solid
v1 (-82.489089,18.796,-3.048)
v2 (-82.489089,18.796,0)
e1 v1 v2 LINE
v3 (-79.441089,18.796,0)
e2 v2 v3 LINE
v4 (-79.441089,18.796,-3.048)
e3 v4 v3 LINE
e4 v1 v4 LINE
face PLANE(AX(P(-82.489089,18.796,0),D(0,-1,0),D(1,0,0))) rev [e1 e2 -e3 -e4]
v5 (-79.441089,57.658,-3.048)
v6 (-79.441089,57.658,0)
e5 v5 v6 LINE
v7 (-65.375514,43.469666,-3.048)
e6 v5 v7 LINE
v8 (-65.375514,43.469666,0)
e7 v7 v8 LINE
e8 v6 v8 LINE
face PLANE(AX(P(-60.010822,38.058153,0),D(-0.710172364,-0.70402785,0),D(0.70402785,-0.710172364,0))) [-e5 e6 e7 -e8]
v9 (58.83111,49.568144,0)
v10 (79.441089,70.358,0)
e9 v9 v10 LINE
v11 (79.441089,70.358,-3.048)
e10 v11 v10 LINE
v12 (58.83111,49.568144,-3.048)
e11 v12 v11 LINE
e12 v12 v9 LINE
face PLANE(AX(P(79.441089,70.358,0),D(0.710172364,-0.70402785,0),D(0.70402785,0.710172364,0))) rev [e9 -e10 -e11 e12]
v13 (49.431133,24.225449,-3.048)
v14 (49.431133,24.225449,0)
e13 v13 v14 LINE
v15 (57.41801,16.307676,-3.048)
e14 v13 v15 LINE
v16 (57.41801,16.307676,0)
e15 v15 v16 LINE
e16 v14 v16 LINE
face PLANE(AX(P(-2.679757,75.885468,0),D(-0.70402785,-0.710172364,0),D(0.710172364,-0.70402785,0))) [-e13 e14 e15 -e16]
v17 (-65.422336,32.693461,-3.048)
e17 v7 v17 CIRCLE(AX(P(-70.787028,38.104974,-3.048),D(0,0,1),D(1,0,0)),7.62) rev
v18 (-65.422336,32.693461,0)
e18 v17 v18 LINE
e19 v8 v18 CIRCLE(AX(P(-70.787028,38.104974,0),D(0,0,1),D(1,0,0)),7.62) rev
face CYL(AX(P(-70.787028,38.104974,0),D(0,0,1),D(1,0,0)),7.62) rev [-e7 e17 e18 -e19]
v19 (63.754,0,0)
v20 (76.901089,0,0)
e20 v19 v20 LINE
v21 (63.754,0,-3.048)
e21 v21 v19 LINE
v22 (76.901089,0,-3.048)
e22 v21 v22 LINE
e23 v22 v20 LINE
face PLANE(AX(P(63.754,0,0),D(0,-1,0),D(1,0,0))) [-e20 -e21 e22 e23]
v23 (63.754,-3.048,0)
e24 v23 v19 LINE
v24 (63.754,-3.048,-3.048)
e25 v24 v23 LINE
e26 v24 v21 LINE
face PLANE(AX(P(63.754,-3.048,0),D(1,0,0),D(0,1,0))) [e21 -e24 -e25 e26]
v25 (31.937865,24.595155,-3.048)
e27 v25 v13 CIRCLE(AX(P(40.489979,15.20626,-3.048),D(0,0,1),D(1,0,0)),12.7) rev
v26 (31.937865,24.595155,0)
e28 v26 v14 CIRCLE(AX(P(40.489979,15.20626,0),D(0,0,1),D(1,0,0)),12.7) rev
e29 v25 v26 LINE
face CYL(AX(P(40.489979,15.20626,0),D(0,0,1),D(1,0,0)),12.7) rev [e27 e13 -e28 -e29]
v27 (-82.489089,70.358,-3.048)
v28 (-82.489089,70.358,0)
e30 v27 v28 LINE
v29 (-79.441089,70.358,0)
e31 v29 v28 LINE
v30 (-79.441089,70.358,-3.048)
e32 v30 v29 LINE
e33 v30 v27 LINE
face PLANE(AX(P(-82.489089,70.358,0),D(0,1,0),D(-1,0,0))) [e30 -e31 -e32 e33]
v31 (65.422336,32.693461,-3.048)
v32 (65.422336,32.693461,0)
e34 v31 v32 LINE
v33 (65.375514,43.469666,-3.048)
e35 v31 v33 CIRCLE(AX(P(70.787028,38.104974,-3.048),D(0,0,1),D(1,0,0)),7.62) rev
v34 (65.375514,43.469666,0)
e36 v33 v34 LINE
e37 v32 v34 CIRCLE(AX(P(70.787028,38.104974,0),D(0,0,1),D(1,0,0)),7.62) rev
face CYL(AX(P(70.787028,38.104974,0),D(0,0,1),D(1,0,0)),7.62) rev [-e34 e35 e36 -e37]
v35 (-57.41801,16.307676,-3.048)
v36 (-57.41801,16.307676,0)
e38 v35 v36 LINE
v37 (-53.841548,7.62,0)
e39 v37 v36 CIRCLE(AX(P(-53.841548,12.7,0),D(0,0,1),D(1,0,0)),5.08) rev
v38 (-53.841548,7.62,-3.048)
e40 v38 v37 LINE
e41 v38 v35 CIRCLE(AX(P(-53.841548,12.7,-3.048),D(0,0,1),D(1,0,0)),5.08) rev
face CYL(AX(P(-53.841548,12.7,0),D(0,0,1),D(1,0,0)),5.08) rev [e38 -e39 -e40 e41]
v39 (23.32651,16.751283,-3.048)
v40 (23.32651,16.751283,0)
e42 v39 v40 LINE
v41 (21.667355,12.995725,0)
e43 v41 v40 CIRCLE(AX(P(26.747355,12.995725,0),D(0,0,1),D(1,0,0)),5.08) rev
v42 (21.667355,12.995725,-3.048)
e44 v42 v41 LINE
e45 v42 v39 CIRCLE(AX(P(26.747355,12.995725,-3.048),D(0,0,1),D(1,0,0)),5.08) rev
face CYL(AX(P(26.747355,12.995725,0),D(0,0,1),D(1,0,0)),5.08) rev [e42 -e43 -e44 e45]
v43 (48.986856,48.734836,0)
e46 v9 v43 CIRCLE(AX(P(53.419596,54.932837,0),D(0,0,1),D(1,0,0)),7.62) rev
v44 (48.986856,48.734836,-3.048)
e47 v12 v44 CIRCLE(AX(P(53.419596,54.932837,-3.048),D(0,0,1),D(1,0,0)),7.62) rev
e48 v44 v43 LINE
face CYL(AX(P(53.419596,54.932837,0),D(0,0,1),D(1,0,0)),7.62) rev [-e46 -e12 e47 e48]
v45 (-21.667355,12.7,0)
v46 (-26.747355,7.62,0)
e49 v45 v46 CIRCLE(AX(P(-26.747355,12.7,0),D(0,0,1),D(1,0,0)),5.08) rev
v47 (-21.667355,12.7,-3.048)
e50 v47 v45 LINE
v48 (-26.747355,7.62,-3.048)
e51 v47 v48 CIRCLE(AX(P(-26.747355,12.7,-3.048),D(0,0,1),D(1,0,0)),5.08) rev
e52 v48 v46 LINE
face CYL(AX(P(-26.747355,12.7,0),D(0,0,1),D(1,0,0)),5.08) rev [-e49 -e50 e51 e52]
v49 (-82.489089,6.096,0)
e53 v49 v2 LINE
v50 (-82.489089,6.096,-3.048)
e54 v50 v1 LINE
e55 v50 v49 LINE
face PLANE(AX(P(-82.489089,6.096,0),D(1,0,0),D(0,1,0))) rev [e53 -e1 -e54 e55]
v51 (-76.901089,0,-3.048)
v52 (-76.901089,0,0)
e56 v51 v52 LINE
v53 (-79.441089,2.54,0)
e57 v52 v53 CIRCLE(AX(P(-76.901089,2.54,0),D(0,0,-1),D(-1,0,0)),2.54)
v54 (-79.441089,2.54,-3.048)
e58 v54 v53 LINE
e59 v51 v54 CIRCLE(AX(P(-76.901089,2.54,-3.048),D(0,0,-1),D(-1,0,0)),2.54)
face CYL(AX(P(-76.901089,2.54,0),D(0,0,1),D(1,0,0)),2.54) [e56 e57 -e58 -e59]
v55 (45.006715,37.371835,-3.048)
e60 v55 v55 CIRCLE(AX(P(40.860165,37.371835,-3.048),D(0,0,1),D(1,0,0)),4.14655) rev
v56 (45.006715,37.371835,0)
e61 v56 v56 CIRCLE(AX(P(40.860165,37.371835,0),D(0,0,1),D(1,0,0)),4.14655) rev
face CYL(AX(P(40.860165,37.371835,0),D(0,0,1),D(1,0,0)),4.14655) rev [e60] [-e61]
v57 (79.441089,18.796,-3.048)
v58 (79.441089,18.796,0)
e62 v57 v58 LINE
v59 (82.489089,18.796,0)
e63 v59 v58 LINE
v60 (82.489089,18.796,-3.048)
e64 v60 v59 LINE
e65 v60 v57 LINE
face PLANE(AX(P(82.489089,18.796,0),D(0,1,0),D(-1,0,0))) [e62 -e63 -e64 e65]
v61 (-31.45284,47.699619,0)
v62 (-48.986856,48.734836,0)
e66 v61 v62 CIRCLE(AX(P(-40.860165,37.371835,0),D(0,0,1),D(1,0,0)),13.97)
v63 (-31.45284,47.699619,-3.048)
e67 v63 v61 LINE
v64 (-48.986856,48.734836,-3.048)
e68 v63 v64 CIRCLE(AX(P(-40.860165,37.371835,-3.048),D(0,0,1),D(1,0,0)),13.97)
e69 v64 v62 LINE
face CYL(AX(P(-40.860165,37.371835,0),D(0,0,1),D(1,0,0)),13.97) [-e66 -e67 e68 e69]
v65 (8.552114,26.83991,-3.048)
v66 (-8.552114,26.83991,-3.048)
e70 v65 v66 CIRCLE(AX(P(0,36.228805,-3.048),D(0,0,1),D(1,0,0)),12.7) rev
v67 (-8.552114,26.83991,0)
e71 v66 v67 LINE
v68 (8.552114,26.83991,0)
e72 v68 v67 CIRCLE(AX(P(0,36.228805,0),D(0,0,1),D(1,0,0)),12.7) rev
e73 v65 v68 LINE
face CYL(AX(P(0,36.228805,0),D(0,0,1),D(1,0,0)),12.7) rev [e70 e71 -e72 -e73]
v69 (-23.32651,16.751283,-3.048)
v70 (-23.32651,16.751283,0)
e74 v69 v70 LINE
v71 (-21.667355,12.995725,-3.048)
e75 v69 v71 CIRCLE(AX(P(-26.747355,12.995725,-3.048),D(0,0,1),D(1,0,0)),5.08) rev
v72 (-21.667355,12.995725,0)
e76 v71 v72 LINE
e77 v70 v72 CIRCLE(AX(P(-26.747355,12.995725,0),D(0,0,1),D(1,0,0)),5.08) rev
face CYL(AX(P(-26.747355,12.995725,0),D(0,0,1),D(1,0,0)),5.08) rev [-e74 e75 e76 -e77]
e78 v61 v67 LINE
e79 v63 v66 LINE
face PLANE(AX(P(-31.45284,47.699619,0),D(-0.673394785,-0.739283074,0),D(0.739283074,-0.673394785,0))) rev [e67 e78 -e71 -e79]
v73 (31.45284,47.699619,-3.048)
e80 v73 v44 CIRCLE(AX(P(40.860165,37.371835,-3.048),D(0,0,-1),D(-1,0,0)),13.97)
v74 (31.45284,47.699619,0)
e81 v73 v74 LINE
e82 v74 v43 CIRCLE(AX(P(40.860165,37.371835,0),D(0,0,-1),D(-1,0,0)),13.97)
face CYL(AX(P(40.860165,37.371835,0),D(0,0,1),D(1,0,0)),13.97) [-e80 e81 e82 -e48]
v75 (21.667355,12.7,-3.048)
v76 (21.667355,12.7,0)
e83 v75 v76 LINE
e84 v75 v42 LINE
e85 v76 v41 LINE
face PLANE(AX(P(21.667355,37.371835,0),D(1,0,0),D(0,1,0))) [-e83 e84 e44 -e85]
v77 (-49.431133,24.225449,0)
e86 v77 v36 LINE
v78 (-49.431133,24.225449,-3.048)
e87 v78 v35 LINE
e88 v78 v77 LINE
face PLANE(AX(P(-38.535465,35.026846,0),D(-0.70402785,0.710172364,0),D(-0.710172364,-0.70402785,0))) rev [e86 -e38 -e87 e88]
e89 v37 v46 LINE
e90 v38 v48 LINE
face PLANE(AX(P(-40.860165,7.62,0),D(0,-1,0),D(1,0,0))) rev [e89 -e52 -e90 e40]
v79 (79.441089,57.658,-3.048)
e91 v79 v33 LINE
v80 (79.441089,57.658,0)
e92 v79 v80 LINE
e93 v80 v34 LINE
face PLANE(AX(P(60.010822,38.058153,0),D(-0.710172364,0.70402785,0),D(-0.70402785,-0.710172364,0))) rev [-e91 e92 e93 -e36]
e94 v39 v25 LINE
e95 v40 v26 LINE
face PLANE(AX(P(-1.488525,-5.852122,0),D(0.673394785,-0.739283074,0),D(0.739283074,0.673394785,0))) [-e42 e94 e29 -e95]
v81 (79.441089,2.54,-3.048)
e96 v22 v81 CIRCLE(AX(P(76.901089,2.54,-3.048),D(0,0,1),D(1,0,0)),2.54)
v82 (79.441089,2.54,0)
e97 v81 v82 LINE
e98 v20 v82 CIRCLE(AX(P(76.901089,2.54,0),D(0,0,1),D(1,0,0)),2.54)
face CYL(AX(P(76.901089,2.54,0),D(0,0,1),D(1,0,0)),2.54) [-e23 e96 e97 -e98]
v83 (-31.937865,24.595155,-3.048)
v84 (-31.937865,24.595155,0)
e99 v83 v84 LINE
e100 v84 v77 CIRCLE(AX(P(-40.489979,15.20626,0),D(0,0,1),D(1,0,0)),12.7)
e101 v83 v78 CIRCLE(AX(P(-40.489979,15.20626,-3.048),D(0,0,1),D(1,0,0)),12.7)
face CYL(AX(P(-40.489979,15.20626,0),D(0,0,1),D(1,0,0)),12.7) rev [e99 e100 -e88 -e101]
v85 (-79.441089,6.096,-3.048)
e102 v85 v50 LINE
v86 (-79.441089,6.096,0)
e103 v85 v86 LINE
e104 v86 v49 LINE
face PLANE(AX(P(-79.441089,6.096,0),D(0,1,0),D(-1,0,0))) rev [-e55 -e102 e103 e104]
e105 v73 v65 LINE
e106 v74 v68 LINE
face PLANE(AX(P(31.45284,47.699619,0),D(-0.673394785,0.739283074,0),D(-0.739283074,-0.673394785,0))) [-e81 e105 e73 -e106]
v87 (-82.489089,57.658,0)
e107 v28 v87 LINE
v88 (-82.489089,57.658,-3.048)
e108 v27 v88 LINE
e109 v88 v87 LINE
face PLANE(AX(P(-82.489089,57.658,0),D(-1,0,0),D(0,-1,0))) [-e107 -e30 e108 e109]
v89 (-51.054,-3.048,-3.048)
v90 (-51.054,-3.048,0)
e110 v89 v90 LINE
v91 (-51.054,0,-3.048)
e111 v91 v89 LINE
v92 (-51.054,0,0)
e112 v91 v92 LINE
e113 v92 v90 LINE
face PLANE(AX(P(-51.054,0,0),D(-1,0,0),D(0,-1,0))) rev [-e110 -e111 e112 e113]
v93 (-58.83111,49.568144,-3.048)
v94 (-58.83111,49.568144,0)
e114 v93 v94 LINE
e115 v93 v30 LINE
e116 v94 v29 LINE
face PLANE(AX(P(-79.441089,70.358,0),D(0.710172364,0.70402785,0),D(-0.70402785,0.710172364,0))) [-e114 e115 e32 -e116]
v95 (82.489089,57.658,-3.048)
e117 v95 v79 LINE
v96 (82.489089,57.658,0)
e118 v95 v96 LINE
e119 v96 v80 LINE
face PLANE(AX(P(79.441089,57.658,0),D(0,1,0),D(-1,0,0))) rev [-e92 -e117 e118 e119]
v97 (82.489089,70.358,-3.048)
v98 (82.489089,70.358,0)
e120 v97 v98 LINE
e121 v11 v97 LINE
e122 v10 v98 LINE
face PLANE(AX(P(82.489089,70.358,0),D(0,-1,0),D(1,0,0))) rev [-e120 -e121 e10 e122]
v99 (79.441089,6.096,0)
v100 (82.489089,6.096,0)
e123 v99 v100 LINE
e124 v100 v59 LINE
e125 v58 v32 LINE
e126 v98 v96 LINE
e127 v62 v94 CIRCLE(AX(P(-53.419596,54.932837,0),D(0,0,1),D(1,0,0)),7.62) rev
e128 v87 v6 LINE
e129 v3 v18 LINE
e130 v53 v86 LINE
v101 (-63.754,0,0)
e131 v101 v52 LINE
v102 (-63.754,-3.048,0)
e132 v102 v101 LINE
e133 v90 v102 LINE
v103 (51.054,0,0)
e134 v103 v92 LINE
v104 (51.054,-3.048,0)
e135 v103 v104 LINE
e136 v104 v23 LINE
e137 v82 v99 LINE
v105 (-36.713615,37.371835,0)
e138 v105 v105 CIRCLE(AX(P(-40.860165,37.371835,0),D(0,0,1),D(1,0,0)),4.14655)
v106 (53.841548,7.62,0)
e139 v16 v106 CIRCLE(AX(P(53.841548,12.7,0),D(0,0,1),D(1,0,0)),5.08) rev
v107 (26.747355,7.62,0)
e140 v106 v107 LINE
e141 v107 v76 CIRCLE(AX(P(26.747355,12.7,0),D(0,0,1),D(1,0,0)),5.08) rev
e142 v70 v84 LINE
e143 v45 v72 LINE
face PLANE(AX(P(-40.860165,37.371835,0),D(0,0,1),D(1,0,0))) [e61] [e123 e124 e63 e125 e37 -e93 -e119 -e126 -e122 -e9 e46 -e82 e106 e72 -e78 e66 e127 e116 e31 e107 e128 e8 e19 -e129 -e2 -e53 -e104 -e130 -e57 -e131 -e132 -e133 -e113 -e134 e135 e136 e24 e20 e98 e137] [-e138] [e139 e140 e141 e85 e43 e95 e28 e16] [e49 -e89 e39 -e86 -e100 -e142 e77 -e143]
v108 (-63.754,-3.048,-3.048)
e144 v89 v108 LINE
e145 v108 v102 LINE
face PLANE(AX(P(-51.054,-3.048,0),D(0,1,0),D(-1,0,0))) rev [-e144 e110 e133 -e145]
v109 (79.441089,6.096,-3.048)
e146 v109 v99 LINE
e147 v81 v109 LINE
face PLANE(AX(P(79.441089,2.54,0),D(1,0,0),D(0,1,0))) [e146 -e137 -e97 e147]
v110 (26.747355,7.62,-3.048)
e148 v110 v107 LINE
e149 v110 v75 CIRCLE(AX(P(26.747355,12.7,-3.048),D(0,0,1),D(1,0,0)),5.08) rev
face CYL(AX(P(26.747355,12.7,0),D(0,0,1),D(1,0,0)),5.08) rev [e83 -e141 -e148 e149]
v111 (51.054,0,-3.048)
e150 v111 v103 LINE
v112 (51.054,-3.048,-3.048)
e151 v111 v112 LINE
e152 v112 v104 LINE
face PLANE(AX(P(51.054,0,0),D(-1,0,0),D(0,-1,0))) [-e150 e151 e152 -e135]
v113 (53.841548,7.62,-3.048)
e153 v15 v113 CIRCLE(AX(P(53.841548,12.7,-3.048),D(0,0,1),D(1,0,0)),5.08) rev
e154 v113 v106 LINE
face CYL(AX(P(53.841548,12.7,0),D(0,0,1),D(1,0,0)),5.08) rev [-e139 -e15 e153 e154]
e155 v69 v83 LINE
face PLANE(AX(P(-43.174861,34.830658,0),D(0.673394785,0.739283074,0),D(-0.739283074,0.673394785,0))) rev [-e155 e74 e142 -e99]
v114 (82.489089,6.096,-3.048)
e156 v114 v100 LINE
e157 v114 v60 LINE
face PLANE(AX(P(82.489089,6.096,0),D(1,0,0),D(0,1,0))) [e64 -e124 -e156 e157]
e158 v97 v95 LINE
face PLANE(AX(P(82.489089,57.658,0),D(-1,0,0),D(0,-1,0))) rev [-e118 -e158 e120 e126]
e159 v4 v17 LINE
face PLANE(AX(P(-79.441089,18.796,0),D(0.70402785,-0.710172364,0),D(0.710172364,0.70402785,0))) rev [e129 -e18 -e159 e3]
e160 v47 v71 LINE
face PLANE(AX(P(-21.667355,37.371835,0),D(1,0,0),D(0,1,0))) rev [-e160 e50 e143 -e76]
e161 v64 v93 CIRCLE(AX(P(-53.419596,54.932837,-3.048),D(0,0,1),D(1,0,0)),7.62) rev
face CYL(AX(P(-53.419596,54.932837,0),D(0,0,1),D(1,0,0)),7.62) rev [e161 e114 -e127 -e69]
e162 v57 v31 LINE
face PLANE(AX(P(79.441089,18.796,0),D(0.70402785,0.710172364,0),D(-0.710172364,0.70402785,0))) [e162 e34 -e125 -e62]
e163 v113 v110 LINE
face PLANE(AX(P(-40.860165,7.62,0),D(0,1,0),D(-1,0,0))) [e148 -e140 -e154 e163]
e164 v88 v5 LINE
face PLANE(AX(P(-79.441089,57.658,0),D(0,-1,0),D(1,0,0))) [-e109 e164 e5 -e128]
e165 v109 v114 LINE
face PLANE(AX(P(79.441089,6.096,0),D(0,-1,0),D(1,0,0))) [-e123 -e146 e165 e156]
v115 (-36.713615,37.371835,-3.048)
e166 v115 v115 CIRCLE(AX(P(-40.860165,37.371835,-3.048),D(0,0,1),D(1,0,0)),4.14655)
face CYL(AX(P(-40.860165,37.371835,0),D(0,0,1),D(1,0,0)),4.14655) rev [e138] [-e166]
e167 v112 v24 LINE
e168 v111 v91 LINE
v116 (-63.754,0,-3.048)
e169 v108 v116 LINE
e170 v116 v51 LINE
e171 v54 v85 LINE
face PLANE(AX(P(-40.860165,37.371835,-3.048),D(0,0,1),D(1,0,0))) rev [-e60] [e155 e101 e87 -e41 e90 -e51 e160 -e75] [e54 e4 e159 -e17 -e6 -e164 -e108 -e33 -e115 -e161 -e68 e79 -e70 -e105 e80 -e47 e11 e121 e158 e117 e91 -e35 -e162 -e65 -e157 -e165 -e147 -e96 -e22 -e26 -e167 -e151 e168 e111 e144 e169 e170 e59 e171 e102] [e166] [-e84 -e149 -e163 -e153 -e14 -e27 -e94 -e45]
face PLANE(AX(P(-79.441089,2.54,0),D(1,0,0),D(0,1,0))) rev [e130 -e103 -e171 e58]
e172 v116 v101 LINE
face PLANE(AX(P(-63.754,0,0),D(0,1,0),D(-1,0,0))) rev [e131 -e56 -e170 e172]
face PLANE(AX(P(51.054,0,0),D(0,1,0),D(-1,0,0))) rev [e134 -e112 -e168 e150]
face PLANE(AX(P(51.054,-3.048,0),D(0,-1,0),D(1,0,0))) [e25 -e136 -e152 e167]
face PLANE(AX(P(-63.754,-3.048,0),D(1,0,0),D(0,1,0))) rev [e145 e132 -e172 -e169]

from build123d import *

# Parameters (mm, degrees)
SKETCH1_R            = 4.14655
BOSS_EXTRUDE1_DEPTH  = 3.048
FILLET1_R            = 12.7
CUT_EXTRUDE1_DEPTH   = 98.209690942
FILLET2_R            = 5.08
FILLET2_OF_MIRROR1_R = 5.08
BOSS_EXTRUDE2_DEPTH  = 3.048
FILLET3_R            = 7.62


with BuildPart() as part:
    # Sketch1 → Boss-Extrude1 (new body)
    with BuildSketch(Plane.XY):
        with BuildLine():
            Line((51.054, 0), (-51.054, 0))
            Line((-51.054, 0), (-51.054, -3.048))
            Line((-51.054, -3.048), (-63.754, -3.048))
            Line((-63.754, -3.048), (-63.754, 0))
            Line((-63.754, 0), (-76.901088515, 0))
            ThreePointArc((-76.901088515, 0), (-78.697139739, 0.743948776), (-79.441088515, 2.54))
            Line((-79.441088515, 2.54), (-79.441088515, 6.096))
            Line((-79.441088515, 6.096), (-82.489088515, 6.096))
            Line((-82.489088515, 6.096), (-82.489088515, 18.796))
            Line((-82.489088515, 18.796), (-79.441088515, 18.796))
            Line((-79.441088515, 18.796), (-50.69543442, 47.292942568))
            ThreePointArc((-50.69543442, 47.292942568), (-41.155344062, 51.338715816), (-31.452840209, 47.699619198))
            Line((-31.452840209, 47.699619198), (0, 19.05))
            Line((0, 19.05), (31.452840209, 47.699619198))
            ThreePointArc((31.452840209, 47.699619198), (41.155344062, 51.338715816), (50.69543442, 47.292942568))
            Line((50.69543442, 47.292942568), (79.441088515, 18.796))
            Line((79.441088515, 18.796), (82.489088515, 18.796))
            Line((82.489088515, 18.796), (82.489088515, 6.096))
            Line((82.489088515, 6.096), (79.441088515, 6.096))
            Line((79.441088515, 6.096), (79.441088515, 2.54))
            ThreePointArc((79.441088515, 2.54), (78.697139739, 0.743948776), (76.901088515, 0))
            Line((76.901088515, 0), (63.754, 0))
            Line((63.754, 0), (63.754, -3.048))
            Line((63.754, -3.048), (51.054, -3.048))
            Line((51.054, -3.048), (51.054, 0))
        make_face()
        with Locations((40.860165351, 37.371834649)):
            Circle(SKETCH1_R, mode=Mode.SUBTRACT)
        with Locations((-40.860165351, 37.371834649)):
            Circle(SKETCH1_R, mode=Mode.SUBTRACT)
    extrude(amount=-BOSS_EXTRUDE1_DEPTH)

    # Fillet1
    fillet1_edges = [part.edges().sort_by_distance(p)[0] for p in [
        (0, 19.05, -1.524),
    ]]
    fillet(fillet1_edges, radius=FILLET1_R)

    # Sketch3 → Cut-Extrude1 (cut, symmetric)
    with BuildSketch(Plane.XY):
        with BuildLine():
            Line((-49.43113261, 24.225449161), (-66.181508428, 7.62))
            Line((-66.181508428, 7.62), (-21.667355118, 7.62))
            Line((-21.667355118, 7.62), (-21.667355118, 15.24))
            Line((-21.667355118, 15.24), (-31.937865146, 24.595155188))
            ThreePointArc((-31.937865146, 24.595155188), (-40.758323194, 27.903424841), (-49.43113261, 24.225449161))
        make_face()
    cut_extrude1 = extrude(amount=CUT_EXTRUDE1_DEPTH, both=True, mode=Mode.SUBTRACT)

    # Fillet2
    fillet2_edges = [part.edges().sort_by_distance(p)[0] for p in [
        (-21.667355118, 7.62, -1.524),
        (-66.181508428, 7.62, -1.524),
        (-21.667355118, 15.24, -1.524),
    ]]
    fillet(fillet2_edges, radius=FILLET2_R)

    # Mirror1: Cut-Extrude1 across plane
    add(cut_extrude1.mirror(Plane(origin=(0, 0, 0), x_dir=(0, 0, 1), z_dir=(1, 0, 0))), mode=Mode.SUBTRACT)

    # Fillet2 of Mirror1
    fillet2_of_mirror1_edges = [part.edges().sort_by_distance(p)[0] for p in [
        (21.667355118, 7.62, -1.524),
        (66.181508428, 7.62, -1.524),
        (21.667355118, 15.24, -1.524),
    ]]
    fillet(fillet2_of_mirror1_edges, radius=FILLET2_OF_MIRROR1_R)

    # Sketch4 → Boss-Extrude2 (add)
    with BuildSketch(Plane(origin=(0, 0, -3.048), x_dir=(-1, 0, 0), z_dir=(0, 0, -1))):
        Polygon((-82.489088515, 70.358), (-79.441088515, 70.358), (-53.661061877, 44.352974145), (-60.010822133, 38.058152927), (-79.441088515, 57.658), (-82.489088515, 57.658), align=None)
    boss_extrude2 = extrude(amount=-BOSS_EXTRUDE2_DEPTH)

    # Mirror3: Boss-Extrude2 across plane
    add(boss_extrude2.mirror(Plane(origin=(0, 0, 0), x_dir=(0, 0, 1), z_dir=(1, 0, 0))))

    # Fillet3
    fillet3_edges = [part.edges().sort_by_distance(p)[0] for p in [
        (60.010822133, 38.058152927, -1.524),
        (53.661061877, 44.352974145, -1.524),
        (-60.010822133, 38.058152927, -1.524),
        (-53.661061877, 44.352974145, -1.524),
    ]]
    fillet(fillet3_edges, radius=FILLET3_R)


solid = part.part
